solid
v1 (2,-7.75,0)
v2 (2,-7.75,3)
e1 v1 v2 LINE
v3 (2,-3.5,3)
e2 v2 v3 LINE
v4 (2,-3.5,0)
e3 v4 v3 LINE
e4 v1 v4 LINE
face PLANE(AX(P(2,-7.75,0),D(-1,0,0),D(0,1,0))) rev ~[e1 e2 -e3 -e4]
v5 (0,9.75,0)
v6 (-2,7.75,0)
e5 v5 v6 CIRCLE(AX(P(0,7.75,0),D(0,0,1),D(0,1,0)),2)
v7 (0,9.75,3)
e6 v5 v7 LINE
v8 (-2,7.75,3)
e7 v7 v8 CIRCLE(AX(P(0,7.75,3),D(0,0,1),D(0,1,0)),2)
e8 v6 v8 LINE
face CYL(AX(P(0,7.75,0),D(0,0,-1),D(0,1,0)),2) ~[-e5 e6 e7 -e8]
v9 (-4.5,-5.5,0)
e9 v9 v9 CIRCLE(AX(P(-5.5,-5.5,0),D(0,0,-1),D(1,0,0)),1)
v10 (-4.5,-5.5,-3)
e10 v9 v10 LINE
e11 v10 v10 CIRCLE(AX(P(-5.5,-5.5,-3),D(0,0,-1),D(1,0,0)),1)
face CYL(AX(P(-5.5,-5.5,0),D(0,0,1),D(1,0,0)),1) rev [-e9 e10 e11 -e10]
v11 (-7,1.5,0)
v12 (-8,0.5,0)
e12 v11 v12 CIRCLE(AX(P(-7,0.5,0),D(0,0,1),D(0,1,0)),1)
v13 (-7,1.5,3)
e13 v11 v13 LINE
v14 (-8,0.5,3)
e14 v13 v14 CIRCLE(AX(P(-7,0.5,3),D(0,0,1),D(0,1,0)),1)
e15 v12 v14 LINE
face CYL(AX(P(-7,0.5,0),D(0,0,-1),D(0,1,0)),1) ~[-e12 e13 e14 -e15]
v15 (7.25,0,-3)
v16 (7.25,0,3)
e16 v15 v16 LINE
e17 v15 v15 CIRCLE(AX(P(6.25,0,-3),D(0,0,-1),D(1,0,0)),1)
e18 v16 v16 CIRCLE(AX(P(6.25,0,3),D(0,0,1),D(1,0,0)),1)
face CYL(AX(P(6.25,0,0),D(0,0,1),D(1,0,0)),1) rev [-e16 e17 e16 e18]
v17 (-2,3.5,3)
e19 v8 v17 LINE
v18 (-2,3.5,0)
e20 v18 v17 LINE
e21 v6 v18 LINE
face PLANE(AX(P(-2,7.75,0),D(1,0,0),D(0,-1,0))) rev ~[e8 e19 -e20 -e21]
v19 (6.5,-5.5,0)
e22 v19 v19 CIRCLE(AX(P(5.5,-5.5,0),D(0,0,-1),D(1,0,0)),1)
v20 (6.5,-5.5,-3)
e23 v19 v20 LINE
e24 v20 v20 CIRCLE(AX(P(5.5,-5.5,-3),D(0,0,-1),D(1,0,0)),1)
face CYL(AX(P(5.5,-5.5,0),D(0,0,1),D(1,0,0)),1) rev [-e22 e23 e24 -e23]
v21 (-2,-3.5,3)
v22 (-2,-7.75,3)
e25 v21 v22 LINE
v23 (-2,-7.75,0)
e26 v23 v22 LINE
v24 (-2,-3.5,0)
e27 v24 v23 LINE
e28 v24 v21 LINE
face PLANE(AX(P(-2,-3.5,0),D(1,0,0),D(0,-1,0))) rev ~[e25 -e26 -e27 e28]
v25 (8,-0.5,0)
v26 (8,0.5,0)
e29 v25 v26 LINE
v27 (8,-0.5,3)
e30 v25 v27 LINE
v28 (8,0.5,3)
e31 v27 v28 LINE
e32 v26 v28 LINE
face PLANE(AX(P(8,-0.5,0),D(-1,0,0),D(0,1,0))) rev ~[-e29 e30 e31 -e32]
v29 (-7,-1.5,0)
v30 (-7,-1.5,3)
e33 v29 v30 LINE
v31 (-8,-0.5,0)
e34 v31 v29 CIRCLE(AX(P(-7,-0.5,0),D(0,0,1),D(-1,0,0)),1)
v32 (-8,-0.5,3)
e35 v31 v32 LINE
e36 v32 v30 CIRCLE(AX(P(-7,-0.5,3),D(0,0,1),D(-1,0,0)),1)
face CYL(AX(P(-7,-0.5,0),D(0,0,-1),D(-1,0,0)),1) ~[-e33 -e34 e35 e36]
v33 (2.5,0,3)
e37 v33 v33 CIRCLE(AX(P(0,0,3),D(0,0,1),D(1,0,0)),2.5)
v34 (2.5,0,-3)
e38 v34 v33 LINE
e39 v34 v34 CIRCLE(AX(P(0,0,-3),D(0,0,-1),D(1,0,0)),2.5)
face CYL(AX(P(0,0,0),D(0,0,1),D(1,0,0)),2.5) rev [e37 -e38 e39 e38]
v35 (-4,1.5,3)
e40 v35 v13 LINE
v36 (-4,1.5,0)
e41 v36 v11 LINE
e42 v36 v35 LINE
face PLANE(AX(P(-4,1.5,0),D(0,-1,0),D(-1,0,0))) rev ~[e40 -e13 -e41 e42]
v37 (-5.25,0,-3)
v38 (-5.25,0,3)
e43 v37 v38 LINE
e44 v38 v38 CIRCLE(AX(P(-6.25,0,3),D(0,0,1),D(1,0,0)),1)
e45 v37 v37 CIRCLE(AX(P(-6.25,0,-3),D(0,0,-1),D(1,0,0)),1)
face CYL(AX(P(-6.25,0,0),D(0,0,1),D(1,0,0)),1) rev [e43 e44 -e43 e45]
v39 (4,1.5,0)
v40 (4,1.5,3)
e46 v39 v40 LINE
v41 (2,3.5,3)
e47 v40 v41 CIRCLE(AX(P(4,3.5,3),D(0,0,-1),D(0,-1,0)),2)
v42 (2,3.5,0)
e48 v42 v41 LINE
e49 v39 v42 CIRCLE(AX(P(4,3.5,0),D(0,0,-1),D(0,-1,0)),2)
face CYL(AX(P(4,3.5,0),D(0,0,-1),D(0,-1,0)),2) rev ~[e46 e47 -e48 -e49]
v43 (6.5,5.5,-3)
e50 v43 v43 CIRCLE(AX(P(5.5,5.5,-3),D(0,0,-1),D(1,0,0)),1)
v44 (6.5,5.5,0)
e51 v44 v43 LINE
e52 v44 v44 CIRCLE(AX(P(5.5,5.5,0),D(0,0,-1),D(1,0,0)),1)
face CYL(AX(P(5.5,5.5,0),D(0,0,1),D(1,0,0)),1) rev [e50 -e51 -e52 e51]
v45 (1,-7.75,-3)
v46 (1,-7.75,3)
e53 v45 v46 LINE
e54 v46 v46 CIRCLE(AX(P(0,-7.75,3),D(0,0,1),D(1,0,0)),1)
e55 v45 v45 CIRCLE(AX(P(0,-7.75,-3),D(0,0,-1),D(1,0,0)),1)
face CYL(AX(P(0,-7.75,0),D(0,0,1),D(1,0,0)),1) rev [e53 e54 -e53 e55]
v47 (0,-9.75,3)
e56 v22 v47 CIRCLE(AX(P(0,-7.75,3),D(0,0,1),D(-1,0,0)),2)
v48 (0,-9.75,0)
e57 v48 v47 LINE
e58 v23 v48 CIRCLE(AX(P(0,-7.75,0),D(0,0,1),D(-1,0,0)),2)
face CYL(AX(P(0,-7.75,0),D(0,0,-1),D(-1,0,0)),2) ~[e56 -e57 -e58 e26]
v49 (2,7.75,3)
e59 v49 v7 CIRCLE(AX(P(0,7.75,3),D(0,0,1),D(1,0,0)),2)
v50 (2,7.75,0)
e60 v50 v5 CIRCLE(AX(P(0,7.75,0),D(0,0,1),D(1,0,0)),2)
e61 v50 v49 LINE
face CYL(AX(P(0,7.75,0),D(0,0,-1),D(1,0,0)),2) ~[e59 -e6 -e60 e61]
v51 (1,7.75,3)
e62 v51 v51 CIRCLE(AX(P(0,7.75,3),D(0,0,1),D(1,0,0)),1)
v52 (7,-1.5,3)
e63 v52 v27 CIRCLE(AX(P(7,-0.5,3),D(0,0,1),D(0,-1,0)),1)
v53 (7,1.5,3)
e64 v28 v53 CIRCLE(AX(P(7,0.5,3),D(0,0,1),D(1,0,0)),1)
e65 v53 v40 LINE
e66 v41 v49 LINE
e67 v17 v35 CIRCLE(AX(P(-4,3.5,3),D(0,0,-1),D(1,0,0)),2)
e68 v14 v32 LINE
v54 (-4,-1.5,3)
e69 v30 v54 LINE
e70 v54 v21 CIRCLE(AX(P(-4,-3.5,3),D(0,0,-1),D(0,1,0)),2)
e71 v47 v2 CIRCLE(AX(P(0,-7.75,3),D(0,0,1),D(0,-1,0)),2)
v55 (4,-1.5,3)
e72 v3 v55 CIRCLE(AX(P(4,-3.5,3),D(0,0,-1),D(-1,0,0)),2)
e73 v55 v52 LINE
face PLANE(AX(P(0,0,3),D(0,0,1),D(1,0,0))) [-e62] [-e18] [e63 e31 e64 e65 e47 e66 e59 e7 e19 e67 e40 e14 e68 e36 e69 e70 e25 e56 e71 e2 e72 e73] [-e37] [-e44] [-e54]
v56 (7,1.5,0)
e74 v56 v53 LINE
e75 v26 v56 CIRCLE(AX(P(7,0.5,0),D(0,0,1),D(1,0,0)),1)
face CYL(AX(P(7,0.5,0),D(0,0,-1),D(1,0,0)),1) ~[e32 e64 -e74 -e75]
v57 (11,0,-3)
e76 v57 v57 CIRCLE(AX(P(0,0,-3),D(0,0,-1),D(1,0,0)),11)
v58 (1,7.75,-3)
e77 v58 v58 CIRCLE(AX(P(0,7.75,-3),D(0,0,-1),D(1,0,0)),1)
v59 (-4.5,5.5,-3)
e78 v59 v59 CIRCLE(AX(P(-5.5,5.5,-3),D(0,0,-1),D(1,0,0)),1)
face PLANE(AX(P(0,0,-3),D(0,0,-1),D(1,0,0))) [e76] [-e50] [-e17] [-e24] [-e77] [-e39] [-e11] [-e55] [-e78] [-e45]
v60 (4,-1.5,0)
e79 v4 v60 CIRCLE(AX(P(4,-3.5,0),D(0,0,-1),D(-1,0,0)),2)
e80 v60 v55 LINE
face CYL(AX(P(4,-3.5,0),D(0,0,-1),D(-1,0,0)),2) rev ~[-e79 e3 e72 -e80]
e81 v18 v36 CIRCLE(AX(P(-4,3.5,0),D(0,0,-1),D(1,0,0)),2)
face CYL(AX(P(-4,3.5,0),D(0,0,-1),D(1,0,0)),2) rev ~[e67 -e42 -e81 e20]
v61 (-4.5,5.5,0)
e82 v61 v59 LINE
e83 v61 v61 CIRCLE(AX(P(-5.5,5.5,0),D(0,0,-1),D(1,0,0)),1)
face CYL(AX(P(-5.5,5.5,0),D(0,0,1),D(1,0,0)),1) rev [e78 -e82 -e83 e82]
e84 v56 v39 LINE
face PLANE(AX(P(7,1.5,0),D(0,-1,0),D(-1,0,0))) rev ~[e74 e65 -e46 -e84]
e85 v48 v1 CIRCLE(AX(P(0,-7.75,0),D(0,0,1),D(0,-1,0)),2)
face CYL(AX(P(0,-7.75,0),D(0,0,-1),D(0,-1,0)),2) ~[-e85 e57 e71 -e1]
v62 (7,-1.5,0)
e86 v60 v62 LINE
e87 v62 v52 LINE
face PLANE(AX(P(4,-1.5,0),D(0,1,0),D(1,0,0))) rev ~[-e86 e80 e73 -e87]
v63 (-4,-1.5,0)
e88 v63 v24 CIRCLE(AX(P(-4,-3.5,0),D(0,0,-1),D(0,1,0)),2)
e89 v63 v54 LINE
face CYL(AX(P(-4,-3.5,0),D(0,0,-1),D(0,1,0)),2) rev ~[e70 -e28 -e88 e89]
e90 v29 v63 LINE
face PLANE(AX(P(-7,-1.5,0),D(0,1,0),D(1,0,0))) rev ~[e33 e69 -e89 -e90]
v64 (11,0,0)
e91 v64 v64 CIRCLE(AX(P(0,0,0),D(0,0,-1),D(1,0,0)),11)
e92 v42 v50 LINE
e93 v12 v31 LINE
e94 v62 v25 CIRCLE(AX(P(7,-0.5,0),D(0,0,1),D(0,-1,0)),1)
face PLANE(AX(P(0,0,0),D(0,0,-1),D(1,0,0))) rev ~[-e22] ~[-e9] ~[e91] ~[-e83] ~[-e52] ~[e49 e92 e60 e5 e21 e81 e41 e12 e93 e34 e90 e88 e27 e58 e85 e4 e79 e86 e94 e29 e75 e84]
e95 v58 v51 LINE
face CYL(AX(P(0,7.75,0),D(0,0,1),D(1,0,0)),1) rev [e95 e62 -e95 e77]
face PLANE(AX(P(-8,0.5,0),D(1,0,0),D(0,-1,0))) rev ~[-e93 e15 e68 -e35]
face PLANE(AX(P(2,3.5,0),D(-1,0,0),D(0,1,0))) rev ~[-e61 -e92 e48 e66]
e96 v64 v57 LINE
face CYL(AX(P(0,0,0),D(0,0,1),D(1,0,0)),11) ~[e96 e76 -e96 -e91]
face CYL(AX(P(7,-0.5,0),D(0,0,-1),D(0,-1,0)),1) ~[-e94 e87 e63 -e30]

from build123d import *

# Parameters (mm, degrees)
F0_R     = 1
F0_R_2   = 2.5
F1_DEPTH = 3
F2_R     = 11
F2_R_2   = 1
F2_R_3   = 2.5
F3_DEPTH = 3


with BuildPart() as f1:
    # F0 (on Top) → F1 (new body)
    with BuildSketch(Plane.XY):
        with BuildLine():
            ThreePointArc((4, 1.5), (2.5857864376, 2.0857864376), (2, 3.5))
            Line((2, 3.5), (2, 7.75))
            ThreePointArc((2, 7.75), (1.4142135624, 9.1642135624), (0, 9.75))
            ThreePointArc((0, 9.75), (-1.4142135624, 9.1642135624), (-2, 7.75))
            Line((-2, 7.75), (-2, 3.5))
            ThreePointArc((-2, 3.5), (-2.5857864376, 2.0857864376), (-4, 1.5))
            Line((-4, 1.5), (-7, 1.5))
            ThreePointArc((-7, 1.5), (-7.7071067812, 1.2071067812), (-8, 0.5))
            Line((-8, 0.5), (-8, -0.5))
            ThreePointArc((-8, -0.5), (-7.7071067812, -1.2071067812), (-7, -1.5))
            Line((-7, -1.5), (-4, -1.5))
            ThreePointArc((-4, -1.5), (-2.5857864376, -2.0857864376), (-2, -3.5))
            Line((-2, -3.5), (-2, -7.75))
            ThreePointArc((-2, -7.75), (-1.4142135624, -9.1642135624), (0, -9.75))
            ThreePointArc((0, -9.75), (1.4142135624, -9.1642135624), (2, -7.75))
            Line((2, -7.75), (2, -3.5))
            ThreePointArc((2, -3.5), (2.5857864376, -2.0857864376), (4, -1.5))
            Line((4, -1.5), (7, -1.5))
            ThreePointArc((7, -1.5), (7.7071067812, -1.2071067812), (8, -0.5))
            Line((8, -0.5), (8, 0.5))
            ThreePointArc((8, 0.5), (7.7071067812, 1.2071067812), (7, 1.5))
            Line((7, 1.5), (4, 1.5))
        make_face()
        with Locations((0, -7.75)):
            Circle(F0_R, mode=Mode.SUBTRACT)
        with Locations((-6.25, 0)):
            Circle(F0_R, mode=Mode.SUBTRACT)
        Circle(F0_R_2, mode=Mode.SUBTRACT)
        with Locations((6.25, 0)):
            Circle(F0_R, mode=Mode.SUBTRACT)
        with Locations((0, 7.75)):
            Circle(F0_R, mode=Mode.SUBTRACT)
    extrude(amount=F1_DEPTH)

    # F2 (on face) → F3 (join)
    with BuildSketch(Plane(origin=(0, 0, 0), x_dir=(1, 0, 0), z_dir=(0, 0, -1))):
        Circle(F2_R)
        with Locations((-5.5, -5.5)):
            Circle(F2_R_2, mode=Mode.SUBTRACT)
        with Locations((5.5, -5.5)):
            Circle(F2_R_2, mode=Mode.SUBTRACT)
        with Locations((-5.5, 5.5)):
            Circle(F2_R_2, mode=Mode.SUBTRACT)
        with BuildLine():
            ThreePointArc((-2, 7.75), (0, 9.75), (2, 7.75))
            Line((2, 7.75), (2, 3.5))
            ThreePointArc((2, 3.5), (2.5857864376, 2.0857864376), (4, 1.5))
            Line((4, 1.5), (7, 1.5))
            ThreePointArc((7, 1.5), (7.7071067812, 1.2071067812), (8, 0.5))
            Line((8, 0.5), (8, -0.5))
            ThreePointArc((8, -0.5), (7.7071067812, -1.2071067812), (7, -1.5))
            Line((7, -1.5), (4, -1.5))
            ThreePointArc((4, -1.5), (2.5857864376, -2.0857864376), (2, -3.5))
            Line((2, -3.5), (2, -7.75))
            ThreePointArc((2, -7.75), (0, -9.75), (-2, -7.75))
            Line((-2, -7.75), (-2, -3.5))
            ThreePointArc((-2, -3.5), (-2.5857864376, -2.0857864376), (-4, -1.5))
            Line((-4, -1.5), (-7, -1.5))
            ThreePointArc((-7, -1.5), (-7.7071067812, -1.2071067812), (-8, -0.5))
            Line((-8, -0.5), (-8, 0.5))
            ThreePointArc((-8, 0.5), (-7.7071067812, 1.2071067812), (-7, 1.5))
            Line((-7, 1.5), (-4, 1.5))
            ThreePointArc((-4, 1.5), (-2.5857864376, 2.0857864376), (-2, 3.5))
            Line((-2, 3.5), (-2, 7.75))
        make_face(mode=Mode.SUBTRACT)
        with Locations((5.5, 5.5)):
            Circle(F2_R_2, mode=Mode.SUBTRACT)
        with BuildLine():
            Line((2, 3.5), (2, 7.75))
            ThreePointArc((2, 7.75), (0, 9.75), (-2, 7.75))
            Line((-2, 7.75), (-2, 3.5))
            ThreePointArc((-2, 3.5), (-2.5857864376, 2.0857864376), (-4, 1.5))
            Line((-4, 1.5), (-7, 1.5))
            ThreePointArc((-7, 1.5), (-7.7071067812, 1.2071067812), (-8, 0.5))
            Line((-8, 0.5), (-8, -0.5))
            ThreePointArc((-8, -0.5), (-7.7071067812, -1.2071067812), (-7, -1.5))
            Line((-7, -1.5), (-4, -1.5))
            ThreePointArc((-4, -1.5), (-2.5857864376, -2.0857864376), (-2, -3.5))
            Line((-2, -3.5), (-2, -7.75))
            ThreePointArc((-2, -7.75), (0, -9.75), (2, -7.75))
            Line((2, -7.75), (2, -3.5))
            ThreePointArc((2, -3.5), (2.5857864376, -2.0857864376), (4, -1.5))
            Line((4, -1.5), (7, -1.5))
            ThreePointArc((7, -1.5), (7.7071067812, -1.2071067812), (8, -0.5))
            Line((8, -0.5), (8, 0.5))
            ThreePointArc((8, 0.5), (7.7071067812, 1.2071067812), (7, 1.5))
            Line((7, 1.5), (4, 1.5))
            ThreePointArc((4, 1.5), (2.5857864376, 2.0857864376), (2, 3.5))
        make_face()
        with Locations((0, -7.75)):
            Circle(F2_R_2, mode=Mode.SUBTRACT)
        with Locations((-6.25, 0)):
            Circle(F2_R_2, mode=Mode.SUBTRACT)
        Circle(F2_R_3, mode=Mode.SUBTRACT)
        with Locations((6.25, 0)):
            Circle(F2_R_2, mode=Mode.SUBTRACT)
        with Locations((0, 7.75)):
            Circle(F2_R_2, mode=Mode.SUBTRACT)
    extrude(amount=F3_DEPTH)


solid = f1.part
